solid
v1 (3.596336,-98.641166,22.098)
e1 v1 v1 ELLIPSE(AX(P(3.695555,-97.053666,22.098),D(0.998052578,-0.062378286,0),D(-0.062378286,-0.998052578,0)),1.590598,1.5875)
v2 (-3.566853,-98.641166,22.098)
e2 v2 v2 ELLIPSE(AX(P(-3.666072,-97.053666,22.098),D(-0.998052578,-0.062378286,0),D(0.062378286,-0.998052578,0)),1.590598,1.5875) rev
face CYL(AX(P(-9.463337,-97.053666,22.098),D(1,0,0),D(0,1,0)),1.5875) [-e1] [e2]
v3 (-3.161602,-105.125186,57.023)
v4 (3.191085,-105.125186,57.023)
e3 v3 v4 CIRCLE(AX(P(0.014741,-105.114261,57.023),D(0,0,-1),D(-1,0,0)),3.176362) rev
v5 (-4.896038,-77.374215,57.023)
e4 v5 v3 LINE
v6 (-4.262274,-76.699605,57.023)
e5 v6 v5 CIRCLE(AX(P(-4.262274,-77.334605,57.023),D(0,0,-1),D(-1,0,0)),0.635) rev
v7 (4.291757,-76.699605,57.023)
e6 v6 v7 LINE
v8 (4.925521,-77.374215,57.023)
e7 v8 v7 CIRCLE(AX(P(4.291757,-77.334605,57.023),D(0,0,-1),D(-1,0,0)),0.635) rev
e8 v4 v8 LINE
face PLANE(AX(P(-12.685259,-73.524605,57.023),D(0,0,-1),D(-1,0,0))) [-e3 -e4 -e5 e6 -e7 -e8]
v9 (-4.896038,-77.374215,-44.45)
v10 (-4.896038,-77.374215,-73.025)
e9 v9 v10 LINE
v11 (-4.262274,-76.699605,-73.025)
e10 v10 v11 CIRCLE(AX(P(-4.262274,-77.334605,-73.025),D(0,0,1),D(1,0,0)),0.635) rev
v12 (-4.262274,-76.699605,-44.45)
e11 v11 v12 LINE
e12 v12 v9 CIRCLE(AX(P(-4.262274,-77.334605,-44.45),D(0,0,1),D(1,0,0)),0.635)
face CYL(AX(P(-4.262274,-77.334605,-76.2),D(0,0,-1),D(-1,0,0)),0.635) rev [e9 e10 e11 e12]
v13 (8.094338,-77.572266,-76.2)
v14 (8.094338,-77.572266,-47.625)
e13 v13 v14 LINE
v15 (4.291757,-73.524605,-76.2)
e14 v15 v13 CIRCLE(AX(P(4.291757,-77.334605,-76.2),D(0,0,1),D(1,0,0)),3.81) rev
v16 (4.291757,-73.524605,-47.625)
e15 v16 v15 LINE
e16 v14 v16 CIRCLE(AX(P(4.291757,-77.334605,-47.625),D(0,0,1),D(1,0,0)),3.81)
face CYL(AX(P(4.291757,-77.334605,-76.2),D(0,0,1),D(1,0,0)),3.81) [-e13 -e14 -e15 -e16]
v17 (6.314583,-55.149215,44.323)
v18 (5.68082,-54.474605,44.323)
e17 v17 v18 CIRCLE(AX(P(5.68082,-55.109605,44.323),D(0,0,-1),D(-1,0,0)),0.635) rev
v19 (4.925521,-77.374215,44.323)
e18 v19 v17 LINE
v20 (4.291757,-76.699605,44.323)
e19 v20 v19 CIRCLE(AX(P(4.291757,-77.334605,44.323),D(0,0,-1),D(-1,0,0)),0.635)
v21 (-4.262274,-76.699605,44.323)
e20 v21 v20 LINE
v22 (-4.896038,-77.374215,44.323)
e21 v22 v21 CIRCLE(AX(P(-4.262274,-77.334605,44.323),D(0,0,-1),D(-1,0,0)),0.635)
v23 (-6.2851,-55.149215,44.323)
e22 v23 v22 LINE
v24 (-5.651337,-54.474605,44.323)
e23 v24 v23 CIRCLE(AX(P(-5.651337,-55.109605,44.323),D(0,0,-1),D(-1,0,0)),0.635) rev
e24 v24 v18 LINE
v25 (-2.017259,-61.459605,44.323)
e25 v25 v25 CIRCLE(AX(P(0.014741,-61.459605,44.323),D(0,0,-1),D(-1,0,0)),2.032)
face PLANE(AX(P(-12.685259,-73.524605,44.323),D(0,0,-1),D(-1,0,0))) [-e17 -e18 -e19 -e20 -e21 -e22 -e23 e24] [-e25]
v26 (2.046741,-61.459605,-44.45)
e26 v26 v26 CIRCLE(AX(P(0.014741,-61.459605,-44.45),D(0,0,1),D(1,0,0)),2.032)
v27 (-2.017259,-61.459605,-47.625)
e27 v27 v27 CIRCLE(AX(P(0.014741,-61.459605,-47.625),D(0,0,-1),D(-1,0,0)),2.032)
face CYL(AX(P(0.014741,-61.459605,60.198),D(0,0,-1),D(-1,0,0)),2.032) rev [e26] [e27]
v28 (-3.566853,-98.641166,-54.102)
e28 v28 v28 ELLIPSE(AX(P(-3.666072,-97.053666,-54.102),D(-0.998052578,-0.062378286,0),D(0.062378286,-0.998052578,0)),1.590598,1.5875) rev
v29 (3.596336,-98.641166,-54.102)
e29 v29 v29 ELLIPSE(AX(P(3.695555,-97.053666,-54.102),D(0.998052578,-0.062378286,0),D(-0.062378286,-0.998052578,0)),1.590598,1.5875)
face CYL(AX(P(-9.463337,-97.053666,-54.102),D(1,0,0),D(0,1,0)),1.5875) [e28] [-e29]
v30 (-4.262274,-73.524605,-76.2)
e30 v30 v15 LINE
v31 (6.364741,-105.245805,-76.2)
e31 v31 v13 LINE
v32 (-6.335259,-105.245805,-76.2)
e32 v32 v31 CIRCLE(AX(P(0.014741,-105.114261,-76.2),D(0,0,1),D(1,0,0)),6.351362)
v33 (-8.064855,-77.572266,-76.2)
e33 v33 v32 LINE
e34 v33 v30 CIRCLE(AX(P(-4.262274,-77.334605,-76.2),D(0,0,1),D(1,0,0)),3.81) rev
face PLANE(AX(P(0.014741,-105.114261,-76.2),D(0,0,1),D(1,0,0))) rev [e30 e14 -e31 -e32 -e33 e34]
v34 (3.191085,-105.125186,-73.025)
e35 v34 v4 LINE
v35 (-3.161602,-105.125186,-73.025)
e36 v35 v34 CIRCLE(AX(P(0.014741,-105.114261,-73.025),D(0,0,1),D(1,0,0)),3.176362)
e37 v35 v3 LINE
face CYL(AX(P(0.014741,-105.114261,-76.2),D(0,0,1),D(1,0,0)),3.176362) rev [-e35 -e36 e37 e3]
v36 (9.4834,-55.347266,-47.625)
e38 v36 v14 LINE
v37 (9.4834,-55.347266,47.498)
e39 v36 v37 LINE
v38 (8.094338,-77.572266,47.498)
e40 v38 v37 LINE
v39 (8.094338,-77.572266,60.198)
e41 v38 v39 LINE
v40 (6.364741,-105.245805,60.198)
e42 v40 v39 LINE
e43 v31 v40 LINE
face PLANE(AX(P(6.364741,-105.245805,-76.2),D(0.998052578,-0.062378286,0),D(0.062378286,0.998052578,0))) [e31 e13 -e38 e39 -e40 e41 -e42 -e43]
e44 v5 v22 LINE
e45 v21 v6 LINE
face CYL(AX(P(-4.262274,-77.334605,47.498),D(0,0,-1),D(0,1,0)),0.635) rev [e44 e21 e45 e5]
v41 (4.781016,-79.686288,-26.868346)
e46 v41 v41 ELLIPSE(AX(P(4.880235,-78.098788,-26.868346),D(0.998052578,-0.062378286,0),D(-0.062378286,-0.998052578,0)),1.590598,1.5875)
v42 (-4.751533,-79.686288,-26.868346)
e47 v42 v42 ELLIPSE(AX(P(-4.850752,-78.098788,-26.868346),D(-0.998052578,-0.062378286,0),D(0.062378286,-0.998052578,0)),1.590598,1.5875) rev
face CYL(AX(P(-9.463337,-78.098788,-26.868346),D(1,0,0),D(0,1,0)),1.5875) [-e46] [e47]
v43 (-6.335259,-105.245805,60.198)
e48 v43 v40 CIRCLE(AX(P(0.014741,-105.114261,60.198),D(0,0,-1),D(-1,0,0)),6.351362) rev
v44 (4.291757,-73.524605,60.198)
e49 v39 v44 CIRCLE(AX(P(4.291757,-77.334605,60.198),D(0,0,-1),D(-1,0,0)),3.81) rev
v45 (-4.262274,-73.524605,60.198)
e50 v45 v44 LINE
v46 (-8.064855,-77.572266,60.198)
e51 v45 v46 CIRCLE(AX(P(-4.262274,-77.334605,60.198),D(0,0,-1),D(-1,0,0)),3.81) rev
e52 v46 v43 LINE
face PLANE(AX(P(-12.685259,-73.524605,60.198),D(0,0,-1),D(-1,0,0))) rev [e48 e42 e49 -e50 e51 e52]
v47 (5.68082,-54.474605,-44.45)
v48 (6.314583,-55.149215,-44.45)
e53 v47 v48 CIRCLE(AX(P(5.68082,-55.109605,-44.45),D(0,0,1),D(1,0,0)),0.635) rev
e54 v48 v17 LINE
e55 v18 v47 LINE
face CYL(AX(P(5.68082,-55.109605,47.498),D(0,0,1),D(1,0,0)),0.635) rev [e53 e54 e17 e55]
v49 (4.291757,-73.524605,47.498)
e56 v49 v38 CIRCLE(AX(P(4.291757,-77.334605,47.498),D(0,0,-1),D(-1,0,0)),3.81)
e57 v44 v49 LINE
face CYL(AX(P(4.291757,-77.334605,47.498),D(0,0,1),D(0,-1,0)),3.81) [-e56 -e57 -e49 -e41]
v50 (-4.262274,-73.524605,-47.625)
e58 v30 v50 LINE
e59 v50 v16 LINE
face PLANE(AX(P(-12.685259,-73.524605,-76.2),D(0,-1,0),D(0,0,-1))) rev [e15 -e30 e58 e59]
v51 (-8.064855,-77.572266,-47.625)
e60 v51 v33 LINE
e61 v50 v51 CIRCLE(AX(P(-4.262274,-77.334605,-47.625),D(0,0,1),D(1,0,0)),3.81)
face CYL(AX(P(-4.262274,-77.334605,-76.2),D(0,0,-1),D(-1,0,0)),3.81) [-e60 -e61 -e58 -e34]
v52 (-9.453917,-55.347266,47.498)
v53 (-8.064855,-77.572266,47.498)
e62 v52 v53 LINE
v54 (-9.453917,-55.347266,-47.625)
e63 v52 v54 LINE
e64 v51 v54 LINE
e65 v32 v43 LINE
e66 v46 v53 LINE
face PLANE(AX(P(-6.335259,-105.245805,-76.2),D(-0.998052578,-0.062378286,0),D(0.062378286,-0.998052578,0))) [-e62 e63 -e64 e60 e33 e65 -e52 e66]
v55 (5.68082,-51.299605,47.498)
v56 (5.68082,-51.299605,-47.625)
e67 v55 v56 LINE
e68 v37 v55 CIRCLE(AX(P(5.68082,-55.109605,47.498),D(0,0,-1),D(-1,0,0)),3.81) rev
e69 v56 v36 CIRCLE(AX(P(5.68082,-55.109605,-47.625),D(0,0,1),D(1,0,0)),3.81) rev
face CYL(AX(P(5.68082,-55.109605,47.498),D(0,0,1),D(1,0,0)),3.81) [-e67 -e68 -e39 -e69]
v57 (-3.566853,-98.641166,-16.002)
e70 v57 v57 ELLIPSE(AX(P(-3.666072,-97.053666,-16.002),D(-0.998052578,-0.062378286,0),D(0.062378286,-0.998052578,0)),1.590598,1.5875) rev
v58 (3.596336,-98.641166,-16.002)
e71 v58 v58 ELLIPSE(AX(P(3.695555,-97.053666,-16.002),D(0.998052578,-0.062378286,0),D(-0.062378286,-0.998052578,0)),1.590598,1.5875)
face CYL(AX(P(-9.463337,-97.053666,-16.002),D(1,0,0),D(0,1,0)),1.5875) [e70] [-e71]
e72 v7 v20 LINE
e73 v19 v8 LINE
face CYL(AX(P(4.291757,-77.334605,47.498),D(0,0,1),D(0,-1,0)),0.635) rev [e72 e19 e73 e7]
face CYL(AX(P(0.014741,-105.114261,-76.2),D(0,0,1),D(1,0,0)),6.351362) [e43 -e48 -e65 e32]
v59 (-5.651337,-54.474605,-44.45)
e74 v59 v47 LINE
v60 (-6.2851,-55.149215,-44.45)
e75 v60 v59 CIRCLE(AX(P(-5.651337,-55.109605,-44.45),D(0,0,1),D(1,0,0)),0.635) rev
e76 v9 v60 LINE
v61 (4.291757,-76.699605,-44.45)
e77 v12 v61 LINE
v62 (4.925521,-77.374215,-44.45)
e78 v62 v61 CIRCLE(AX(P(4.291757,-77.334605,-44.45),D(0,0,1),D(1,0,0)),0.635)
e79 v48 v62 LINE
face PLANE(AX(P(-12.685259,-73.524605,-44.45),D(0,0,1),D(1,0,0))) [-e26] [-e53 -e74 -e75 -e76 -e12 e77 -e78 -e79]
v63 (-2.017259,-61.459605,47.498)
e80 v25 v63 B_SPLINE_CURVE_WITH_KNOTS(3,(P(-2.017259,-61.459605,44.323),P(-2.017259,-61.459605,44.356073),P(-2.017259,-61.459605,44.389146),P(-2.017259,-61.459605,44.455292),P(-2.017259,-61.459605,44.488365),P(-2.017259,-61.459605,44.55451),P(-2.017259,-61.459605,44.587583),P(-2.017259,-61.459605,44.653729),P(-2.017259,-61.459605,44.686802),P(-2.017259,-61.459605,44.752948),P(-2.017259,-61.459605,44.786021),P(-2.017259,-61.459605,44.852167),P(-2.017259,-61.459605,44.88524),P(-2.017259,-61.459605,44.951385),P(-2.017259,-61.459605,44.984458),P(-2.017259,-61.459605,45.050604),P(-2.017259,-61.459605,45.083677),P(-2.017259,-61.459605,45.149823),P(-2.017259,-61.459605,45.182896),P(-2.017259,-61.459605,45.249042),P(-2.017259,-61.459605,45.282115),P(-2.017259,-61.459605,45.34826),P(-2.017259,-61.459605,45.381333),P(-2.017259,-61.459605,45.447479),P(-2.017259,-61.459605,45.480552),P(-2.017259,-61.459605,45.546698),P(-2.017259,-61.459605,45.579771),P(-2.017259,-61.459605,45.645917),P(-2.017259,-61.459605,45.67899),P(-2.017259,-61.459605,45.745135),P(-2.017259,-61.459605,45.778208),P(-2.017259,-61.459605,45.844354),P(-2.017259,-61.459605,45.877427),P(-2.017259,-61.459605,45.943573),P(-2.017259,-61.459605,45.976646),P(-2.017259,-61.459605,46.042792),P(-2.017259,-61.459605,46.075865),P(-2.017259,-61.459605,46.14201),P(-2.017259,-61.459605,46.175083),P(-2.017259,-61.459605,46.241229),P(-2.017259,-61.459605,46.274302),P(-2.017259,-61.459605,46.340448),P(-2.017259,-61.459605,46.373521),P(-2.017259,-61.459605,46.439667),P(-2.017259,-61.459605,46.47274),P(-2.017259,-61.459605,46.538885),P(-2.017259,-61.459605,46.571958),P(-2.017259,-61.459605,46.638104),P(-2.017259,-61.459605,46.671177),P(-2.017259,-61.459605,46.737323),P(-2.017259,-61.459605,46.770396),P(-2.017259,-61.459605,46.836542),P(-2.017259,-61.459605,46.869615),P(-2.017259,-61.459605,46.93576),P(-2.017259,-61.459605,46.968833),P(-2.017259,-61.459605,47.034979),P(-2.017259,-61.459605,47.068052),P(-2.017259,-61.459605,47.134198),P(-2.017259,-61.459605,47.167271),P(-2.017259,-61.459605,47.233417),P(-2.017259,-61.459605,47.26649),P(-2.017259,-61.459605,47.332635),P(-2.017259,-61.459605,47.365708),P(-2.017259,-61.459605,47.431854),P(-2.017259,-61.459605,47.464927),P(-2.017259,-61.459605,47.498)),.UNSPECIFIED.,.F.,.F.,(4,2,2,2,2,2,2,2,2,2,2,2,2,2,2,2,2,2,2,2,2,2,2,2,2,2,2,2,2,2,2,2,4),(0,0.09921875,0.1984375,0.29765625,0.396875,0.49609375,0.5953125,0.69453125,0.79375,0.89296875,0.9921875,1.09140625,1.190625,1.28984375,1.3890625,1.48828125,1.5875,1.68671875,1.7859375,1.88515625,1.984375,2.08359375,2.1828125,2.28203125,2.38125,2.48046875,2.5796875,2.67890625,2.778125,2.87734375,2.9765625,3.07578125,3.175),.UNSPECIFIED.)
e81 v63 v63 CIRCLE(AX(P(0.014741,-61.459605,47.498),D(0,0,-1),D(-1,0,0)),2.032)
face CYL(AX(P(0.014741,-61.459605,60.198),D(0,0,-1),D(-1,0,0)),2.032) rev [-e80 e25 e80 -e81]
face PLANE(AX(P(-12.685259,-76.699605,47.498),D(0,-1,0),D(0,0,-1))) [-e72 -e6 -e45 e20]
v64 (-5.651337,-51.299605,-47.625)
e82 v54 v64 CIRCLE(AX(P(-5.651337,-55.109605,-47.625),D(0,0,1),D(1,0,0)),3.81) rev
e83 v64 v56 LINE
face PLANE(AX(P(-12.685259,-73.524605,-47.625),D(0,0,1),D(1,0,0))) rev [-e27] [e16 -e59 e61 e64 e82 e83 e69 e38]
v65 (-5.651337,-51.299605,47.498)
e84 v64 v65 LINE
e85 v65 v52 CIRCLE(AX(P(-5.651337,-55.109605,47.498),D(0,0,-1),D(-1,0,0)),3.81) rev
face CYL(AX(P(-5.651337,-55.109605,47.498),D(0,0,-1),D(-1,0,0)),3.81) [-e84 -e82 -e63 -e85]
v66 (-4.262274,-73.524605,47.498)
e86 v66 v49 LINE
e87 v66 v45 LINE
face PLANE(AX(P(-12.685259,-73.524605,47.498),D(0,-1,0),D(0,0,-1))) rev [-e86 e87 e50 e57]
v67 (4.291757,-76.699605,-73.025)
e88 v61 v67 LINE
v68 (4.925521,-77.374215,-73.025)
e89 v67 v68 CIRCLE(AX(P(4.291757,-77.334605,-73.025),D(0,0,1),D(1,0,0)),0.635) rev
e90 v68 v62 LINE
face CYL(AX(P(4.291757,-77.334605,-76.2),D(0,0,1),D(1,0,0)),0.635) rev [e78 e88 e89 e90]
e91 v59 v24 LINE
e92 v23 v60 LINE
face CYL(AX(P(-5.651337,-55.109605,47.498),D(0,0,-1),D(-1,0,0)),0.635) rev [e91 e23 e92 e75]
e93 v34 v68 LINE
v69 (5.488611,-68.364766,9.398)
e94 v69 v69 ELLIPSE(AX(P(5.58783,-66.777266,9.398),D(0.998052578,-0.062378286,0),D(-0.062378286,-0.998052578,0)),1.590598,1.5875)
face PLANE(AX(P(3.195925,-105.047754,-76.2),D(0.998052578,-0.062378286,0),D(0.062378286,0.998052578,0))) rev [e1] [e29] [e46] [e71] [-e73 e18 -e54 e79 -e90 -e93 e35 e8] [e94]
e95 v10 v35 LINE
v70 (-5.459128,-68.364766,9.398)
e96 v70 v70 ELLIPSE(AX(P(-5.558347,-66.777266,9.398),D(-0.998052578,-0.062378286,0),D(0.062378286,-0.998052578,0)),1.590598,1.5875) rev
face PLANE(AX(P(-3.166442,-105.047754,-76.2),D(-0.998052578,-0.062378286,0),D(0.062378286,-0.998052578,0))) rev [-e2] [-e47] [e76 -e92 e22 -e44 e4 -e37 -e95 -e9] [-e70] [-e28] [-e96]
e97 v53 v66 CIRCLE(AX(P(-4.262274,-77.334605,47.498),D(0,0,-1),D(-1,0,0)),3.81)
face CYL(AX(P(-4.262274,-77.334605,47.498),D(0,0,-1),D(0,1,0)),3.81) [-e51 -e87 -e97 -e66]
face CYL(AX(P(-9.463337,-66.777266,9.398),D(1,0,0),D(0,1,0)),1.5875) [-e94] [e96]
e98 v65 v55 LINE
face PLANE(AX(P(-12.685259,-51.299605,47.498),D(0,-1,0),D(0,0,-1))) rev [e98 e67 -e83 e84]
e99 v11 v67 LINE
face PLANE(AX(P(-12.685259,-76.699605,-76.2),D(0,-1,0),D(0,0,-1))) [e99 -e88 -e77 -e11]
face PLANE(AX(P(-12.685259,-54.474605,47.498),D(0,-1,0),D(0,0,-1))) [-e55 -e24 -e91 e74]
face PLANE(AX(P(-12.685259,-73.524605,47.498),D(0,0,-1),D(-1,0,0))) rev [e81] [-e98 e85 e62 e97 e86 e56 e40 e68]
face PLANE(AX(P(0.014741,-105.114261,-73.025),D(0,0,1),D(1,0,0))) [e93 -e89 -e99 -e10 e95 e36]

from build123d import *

# Parameters (mm, degrees)
BOSS_EXTRUDE1_DEPTH             = 76.2
BOSS_EXTRUDE1_DEPTH_BACK        = 76.2
CUT_EXTRUDE1_DEPTH              = 136.619651209
CUT_EXTRUDE1_DEPTH_BACK         = 136.619651209
FILLET1_R                       = 3.81
SHELL1_START                    = -44.45
SHELL1_DEPTH                    = 88.773
SHELL1_START_2                  = -73.025
SHELL1_2_DEPTH                  = 130.048
SKETCH14_R                      = 2.032
CUT_EXTRUDE8_DEPTH              = 156.372005628
BOSS_EXTRUDE4_REACH             = 137.201
SKETCH15_R                      = 1.5875
BOSS_EXTRUDE4_DIRECTION_2_REACH = 137.201


# Read off the part's stored shape, not the designer's step: Shell1
with BuildPart() as part:
    # Sketch1 → Boss-Extrude1 (new, two sides: drawn at the far end of the back side and taken through both)
    with BuildSketch(Plane.XY.offset(-BOSS_EXTRUDE1_DEPTH_BACK)):
        with BuildLine():
            Line((-6.335258536, -105.245804705), (-12.685258536, -3.645804705))
            ThreePointArc((-12.685258536, -3.645804705), (0.014741464, 8.866413132), (12.714741464, -3.645804705))
            Line((12.714741464, -3.645804705), (6.364741464, -105.245804705))
            ThreePointArc((6.364741464, -105.245804705), (0.014741464, -111.465623147), (-6.335258536, -105.245804705))
        make_face()
    extrude(amount=BOSS_EXTRUDE1_DEPTH + BOSS_EXTRUDE1_DEPTH_BACK)

    # Sketch4 → Cut-Extrude1 (cut, two sides: drawn at the far end of the back side and taken through both)
    with BuildSketch(Plane(origin=(0, 0, 0), x_dir=(0, 0, -1), z_dir=(1, 0, 0)).offset(-CUT_EXTRUDE1_DEPTH_BACK)):
        Polygon((-47.498, -73.524605007), (-47.498, -51.299605007), (47.625, -51.299605007), (47.625, -73.524605007), (76.2, -73.524605007), (76.2, 8.866413132), (-76.2, 8.866413132), (-76.2, -28.682279346), (-76.2, -111.465623147), (-60.198, -111.465623147), (-60.198, -73.524605007), align=None)
    extrude(amount=CUT_EXTRUDE1_DEPTH + CUT_EXTRUDE1_DEPTH_BACK, mode=Mode.SUBTRACT)

    # Fillet1
    fillet1_edges = [part.edges().sort_by_distance(p)[0] for p in [
        (8.347316445, -73.524605007, 53.848),
        (9.736378945, -51.299605007, -0.0635),
        (-9.706896017, -51.299605007, -0.0635),
        (-8.317833517, -73.524605007, 53.848),
        (-8.317833517, -73.524605007, -61.9125),
        (8.347316445, -73.524605007, -61.9125),
    ]]
    fillet(fillet1_edges, radius=FILLET1_R)

    # Shell1 outline → Shell1 (cut)
    with BuildSketch(Plane.XY.offset(SHELL1_START)):
        with BuildLine():
            ThreePointArc((-3.161602106, -105.125185529), (0.014741465, -108.290623147), (3.191085035, -105.125185529))
            Line((3.191085035, -105.125185529), (6.314583179, -55.149215219))
            ThreePointArc((6.314583179, -55.149215219), (6.143625088, -54.674822007), (5.680819792, -54.474605007))
            Line((5.680819792, -54.474605007), (-5.651336863, -54.474605007))
            ThreePointArc((-5.651336863, -54.474605007), (-6.114142159, -54.674822006), (-6.285100251, -55.149215219))
            Line((-6.285100251, -55.149215219), (-3.161602106, -105.125185529))
        make_face()
    extrude(amount=SHELL1_DEPTH, mode=Mode.SUBTRACT)

    # Shell1 2 outline → Shell1 2 (cut)
    with BuildSketch(Plane.XY.offset(SHELL1_START_2)):
        with BuildLine():
            Line((-4.896037751, -77.374215219), (-3.161602106, -105.125185529))
            ThreePointArc((-3.161602106, -105.125185529), (0.014741465, -108.290623147), (3.191085035, -105.125185529))
            Line((3.191085035, -105.125185529), (4.925520679, -77.374215219))
            ThreePointArc((4.925520679, -77.374215219), (4.754562588, -76.899822007), (4.291757292, -76.699605007))
            Line((4.291757292, -76.699605007), (-4.262274363, -76.699605007))
            ThreePointArc((-4.262274363, -76.699605007), (-4.725079659, -76.899822006), (-4.896037751, -77.374215219))
        make_face()
    extrude(amount=SHELL1_2_DEPTH, mode=Mode.SUBTRACT)

    # Sketch14 → Cut-Extrude8 (cut, through all)
    with BuildSketch(Plane(origin=(0, 0, -47.625), x_dir=(-1, 0, 0), z_dir=(0, 0, -1))):
        with Locations((-0.014741464, -61.459605007)):
            Circle(SKETCH14_R)
    extrude(amount=-CUT_EXTRUDE8_DEPTH, mode=Mode.SUBTRACT)

    # Boss-Extrude4: up to this plane
    boss_extrude4_end = Plane(origin=(3.195924528, -105.047753647, -76.2), z_dir=(0.9980525784828886, -0.062378286155180485, 0))
    # Sketch15 → Boss-Extrude4 (add, up to the surface)
    with BuildSketch(Plane(origin=(3.191103822, -0.502900096, 0), x_dir=(0, 0, -1), z_dir=(1, 0, 0)), mode=Mode.PRIVATE) as boss_extrude4_sk1:
        with Locations(Location((-9.398, -66.274366182, 0), (0, 0, 270))):
            Circle(SKETCH15_R)
    boss_extrude4_tool1 = split(extrude(boss_extrude4_sk1.sketch, amount=BOSS_EXTRUDE4_REACH, mode=Mode.PRIVATE), bisect_by=boss_extrude4_end, keep=Keep.BOTH, mode=Mode.PRIVATE)
    add(boss_extrude4_tool1.solids().sort_by_distance((3.191104, -66.777266, 9.398))[0])
    # Sketch15 → Boss-Extrude4 (add, up to the surface)
    with BuildSketch(Plane(origin=(3.191103822, -0.502900096, 0), x_dir=(0, 0, -1), z_dir=(1, 0, 0)), mode=Mode.PRIVATE) as boss_extrude4_sk2:
        with Locations(Location((26.868345804, -77.595887652, 0), (0, 0, 270))):
            Circle(SKETCH15_R)
    boss_extrude4_tool2 = split(extrude(boss_extrude4_sk2.sketch, amount=BOSS_EXTRUDE4_REACH, mode=Mode.PRIVATE), bisect_by=boss_extrude4_end, keep=Keep.BOTH, mode=Mode.PRIVATE)
    add(boss_extrude4_tool2.solids().sort_by_distance((3.191104, -78.098788, -26.868346))[0])
    # Sketch15 → Boss-Extrude4 (add, up to the surface)
    with BuildSketch(Plane(origin=(3.191103822, -0.502900096, 0), x_dir=(0, 0, -1), z_dir=(1, 0, 0)), mode=Mode.PRIVATE) as boss_extrude4_sk3:
        with Locations(Location((-22.098, -96.55076585, 0), (0, 0, 270))):
            Circle(SKETCH15_R)
    boss_extrude4_tool3 = split(extrude(boss_extrude4_sk3.sketch, amount=BOSS_EXTRUDE4_REACH, mode=Mode.PRIVATE), bisect_by=boss_extrude4_end, keep=Keep.BOTH, mode=Mode.PRIVATE)
    add(boss_extrude4_tool3.solids().sort_by_distance((3.191104, -97.053666, 22.098))[0])
    # Sketch15 → Boss-Extrude4 (add, up to the surface)
    with BuildSketch(Plane(origin=(3.191103822, -0.502900096, 0), x_dir=(0, 0, -1), z_dir=(1, 0, 0)), mode=Mode.PRIVATE) as boss_extrude4_sk4:
        with Locations(Location((16.002, -96.55076585, 0), (0, 0, 270))):
            Circle(SKETCH15_R)
    boss_extrude4_tool4 = split(extrude(boss_extrude4_sk4.sketch, amount=BOSS_EXTRUDE4_REACH, mode=Mode.PRIVATE), bisect_by=boss_extrude4_end, keep=Keep.BOTH, mode=Mode.PRIVATE)
    add(boss_extrude4_tool4.solids().sort_by_distance((3.191104, -97.053666, -16.002))[0])
    # Sketch15 → Boss-Extrude4 (add, up to the surface)
    with BuildSketch(Plane(origin=(3.191103822, -0.502900096, 0), x_dir=(0, 0, -1), z_dir=(1, 0, 0)), mode=Mode.PRIVATE) as boss_extrude4_sk5:
        with Locations(Location((54.102, -96.55076585, 0), (0, 0, 270))):
            Circle(SKETCH15_R)
    boss_extrude4_tool5 = split(extrude(boss_extrude4_sk5.sketch, amount=BOSS_EXTRUDE4_REACH, mode=Mode.PRIVATE), bisect_by=boss_extrude4_end, keep=Keep.BOTH, mode=Mode.PRIVATE)
    add(boss_extrude4_tool5.solids().sort_by_distance((3.191104, -97.053666, -54.102))[0])

    # Boss-Extrude4 direction 2: up to this plane
    boss_extrude4_direction_2_end = Plane(origin=(-3.166441599, -105.047753647, -76.2), z_dir=(-0.9980525784828886, -0.0623782861551806, 0))
    # Sketch15 → Boss-Extrude4 direction 2 (add, up to the surface)
    with BuildSketch(Plane(origin=(3.191103822, -0.502900096, 0), x_dir=(0, 0, -1), z_dir=(1, 0, 0)), mode=Mode.PRIVATE) as boss_extrude4_direction_2_sk1:
        with Locations(Location((-9.398, -66.274366182, 0), (0, 0, 270))):
            Circle(SKETCH15_R)
    boss_extrude4_direction_2_tool1 = split(extrude(boss_extrude4_direction_2_sk1.sketch, amount=-BOSS_EXTRUDE4_DIRECTION_2_REACH, mode=Mode.PRIVATE), bisect_by=boss_extrude4_direction_2_end, keep=Keep.BOTH, mode=Mode.PRIVATE)
    add(boss_extrude4_direction_2_tool1.solids().sort_by_distance((3.191104, -66.777266, 9.398))[0])
    # Sketch15 → Boss-Extrude4 direction 2 (add, up to the surface)
    with BuildSketch(Plane(origin=(3.191103822, -0.502900096, 0), x_dir=(0, 0, -1), z_dir=(1, 0, 0)), mode=Mode.PRIVATE) as boss_extrude4_direction_2_sk2:
        with Locations(Location((26.868345804, -77.595887652, 0), (0, 0, 270))):
            Circle(SKETCH15_R)
    boss_extrude4_direction_2_tool2 = split(extrude(boss_extrude4_direction_2_sk2.sketch, amount=-BOSS_EXTRUDE4_DIRECTION_2_REACH, mode=Mode.PRIVATE), bisect_by=boss_extrude4_direction_2_end, keep=Keep.BOTH, mode=Mode.PRIVATE)
    add(boss_extrude4_direction_2_tool2.solids().sort_by_distance((3.191104, -78.098788, -26.868346))[0])
    # Sketch15 → Boss-Extrude4 direction 2 (add, up to the surface)
    with BuildSketch(Plane(origin=(3.191103822, -0.502900096, 0), x_dir=(0, 0, -1), z_dir=(1, 0, 0)), mode=Mode.PRIVATE) as boss_extrude4_direction_2_sk3:
        with Locations(Location((-22.098, -96.55076585, 0), (0, 0, 270))):
            Circle(SKETCH15_R)
    boss_extrude4_direction_2_tool3 = split(extrude(boss_extrude4_direction_2_sk3.sketch, amount=-BOSS_EXTRUDE4_DIRECTION_2_REACH, mode=Mode.PRIVATE), bisect_by=boss_extrude4_direction_2_end, keep=Keep.BOTH, mode=Mode.PRIVATE)
    add(boss_extrude4_direction_2_tool3.solids().sort_by_distance((3.191104, -97.053666, 22.098))[0])
    # Sketch15 → Boss-Extrude4 direction 2 (add, up to the surface)
    with BuildSketch(Plane(origin=(3.191103822, -0.502900096, 0), x_dir=(0, 0, -1), z_dir=(1, 0, 0)), mode=Mode.PRIVATE) as boss_extrude4_direction_2_sk4:
        with Locations(Location((16.002, -96.55076585, 0), (0, 0, 270))):
            Circle(SKETCH15_R)
    boss_extrude4_direction_2_tool4 = split(extrude(boss_extrude4_direction_2_sk4.sketch, amount=-BOSS_EXTRUDE4_DIRECTION_2_REACH, mode=Mode.PRIVATE), bisect_by=boss_extrude4_direction_2_end, keep=Keep.BOTH, mode=Mode.PRIVATE)
    add(boss_extrude4_direction_2_tool4.solids().sort_by_distance((3.191104, -97.053666, -16.002))[0])
    # Sketch15 → Boss-Extrude4 direction 2 (add, up to the surface)
    with BuildSketch(Plane(origin=(3.191103822, -0.502900096, 0), x_dir=(0, 0, -1), z_dir=(1, 0, 0)), mode=Mode.PRIVATE) as boss_extrude4_direction_2_sk5:
        with Locations(Location((54.102, -96.55076585, 0), (0, 0, 270))):
            Circle(SKETCH15_R)
    boss_extrude4_direction_2_tool5 = split(extrude(boss_extrude4_direction_2_sk5.sketch, amount=-BOSS_EXTRUDE4_DIRECTION_2_REACH, mode=Mode.PRIVATE), bisect_by=boss_extrude4_direction_2_end, keep=Keep.BOTH, mode=Mode.PRIVATE)
    add(boss_extrude4_direction_2_tool5.solids().sort_by_distance((3.191104, -97.053666, -54.102))[0])


solid = part.part
